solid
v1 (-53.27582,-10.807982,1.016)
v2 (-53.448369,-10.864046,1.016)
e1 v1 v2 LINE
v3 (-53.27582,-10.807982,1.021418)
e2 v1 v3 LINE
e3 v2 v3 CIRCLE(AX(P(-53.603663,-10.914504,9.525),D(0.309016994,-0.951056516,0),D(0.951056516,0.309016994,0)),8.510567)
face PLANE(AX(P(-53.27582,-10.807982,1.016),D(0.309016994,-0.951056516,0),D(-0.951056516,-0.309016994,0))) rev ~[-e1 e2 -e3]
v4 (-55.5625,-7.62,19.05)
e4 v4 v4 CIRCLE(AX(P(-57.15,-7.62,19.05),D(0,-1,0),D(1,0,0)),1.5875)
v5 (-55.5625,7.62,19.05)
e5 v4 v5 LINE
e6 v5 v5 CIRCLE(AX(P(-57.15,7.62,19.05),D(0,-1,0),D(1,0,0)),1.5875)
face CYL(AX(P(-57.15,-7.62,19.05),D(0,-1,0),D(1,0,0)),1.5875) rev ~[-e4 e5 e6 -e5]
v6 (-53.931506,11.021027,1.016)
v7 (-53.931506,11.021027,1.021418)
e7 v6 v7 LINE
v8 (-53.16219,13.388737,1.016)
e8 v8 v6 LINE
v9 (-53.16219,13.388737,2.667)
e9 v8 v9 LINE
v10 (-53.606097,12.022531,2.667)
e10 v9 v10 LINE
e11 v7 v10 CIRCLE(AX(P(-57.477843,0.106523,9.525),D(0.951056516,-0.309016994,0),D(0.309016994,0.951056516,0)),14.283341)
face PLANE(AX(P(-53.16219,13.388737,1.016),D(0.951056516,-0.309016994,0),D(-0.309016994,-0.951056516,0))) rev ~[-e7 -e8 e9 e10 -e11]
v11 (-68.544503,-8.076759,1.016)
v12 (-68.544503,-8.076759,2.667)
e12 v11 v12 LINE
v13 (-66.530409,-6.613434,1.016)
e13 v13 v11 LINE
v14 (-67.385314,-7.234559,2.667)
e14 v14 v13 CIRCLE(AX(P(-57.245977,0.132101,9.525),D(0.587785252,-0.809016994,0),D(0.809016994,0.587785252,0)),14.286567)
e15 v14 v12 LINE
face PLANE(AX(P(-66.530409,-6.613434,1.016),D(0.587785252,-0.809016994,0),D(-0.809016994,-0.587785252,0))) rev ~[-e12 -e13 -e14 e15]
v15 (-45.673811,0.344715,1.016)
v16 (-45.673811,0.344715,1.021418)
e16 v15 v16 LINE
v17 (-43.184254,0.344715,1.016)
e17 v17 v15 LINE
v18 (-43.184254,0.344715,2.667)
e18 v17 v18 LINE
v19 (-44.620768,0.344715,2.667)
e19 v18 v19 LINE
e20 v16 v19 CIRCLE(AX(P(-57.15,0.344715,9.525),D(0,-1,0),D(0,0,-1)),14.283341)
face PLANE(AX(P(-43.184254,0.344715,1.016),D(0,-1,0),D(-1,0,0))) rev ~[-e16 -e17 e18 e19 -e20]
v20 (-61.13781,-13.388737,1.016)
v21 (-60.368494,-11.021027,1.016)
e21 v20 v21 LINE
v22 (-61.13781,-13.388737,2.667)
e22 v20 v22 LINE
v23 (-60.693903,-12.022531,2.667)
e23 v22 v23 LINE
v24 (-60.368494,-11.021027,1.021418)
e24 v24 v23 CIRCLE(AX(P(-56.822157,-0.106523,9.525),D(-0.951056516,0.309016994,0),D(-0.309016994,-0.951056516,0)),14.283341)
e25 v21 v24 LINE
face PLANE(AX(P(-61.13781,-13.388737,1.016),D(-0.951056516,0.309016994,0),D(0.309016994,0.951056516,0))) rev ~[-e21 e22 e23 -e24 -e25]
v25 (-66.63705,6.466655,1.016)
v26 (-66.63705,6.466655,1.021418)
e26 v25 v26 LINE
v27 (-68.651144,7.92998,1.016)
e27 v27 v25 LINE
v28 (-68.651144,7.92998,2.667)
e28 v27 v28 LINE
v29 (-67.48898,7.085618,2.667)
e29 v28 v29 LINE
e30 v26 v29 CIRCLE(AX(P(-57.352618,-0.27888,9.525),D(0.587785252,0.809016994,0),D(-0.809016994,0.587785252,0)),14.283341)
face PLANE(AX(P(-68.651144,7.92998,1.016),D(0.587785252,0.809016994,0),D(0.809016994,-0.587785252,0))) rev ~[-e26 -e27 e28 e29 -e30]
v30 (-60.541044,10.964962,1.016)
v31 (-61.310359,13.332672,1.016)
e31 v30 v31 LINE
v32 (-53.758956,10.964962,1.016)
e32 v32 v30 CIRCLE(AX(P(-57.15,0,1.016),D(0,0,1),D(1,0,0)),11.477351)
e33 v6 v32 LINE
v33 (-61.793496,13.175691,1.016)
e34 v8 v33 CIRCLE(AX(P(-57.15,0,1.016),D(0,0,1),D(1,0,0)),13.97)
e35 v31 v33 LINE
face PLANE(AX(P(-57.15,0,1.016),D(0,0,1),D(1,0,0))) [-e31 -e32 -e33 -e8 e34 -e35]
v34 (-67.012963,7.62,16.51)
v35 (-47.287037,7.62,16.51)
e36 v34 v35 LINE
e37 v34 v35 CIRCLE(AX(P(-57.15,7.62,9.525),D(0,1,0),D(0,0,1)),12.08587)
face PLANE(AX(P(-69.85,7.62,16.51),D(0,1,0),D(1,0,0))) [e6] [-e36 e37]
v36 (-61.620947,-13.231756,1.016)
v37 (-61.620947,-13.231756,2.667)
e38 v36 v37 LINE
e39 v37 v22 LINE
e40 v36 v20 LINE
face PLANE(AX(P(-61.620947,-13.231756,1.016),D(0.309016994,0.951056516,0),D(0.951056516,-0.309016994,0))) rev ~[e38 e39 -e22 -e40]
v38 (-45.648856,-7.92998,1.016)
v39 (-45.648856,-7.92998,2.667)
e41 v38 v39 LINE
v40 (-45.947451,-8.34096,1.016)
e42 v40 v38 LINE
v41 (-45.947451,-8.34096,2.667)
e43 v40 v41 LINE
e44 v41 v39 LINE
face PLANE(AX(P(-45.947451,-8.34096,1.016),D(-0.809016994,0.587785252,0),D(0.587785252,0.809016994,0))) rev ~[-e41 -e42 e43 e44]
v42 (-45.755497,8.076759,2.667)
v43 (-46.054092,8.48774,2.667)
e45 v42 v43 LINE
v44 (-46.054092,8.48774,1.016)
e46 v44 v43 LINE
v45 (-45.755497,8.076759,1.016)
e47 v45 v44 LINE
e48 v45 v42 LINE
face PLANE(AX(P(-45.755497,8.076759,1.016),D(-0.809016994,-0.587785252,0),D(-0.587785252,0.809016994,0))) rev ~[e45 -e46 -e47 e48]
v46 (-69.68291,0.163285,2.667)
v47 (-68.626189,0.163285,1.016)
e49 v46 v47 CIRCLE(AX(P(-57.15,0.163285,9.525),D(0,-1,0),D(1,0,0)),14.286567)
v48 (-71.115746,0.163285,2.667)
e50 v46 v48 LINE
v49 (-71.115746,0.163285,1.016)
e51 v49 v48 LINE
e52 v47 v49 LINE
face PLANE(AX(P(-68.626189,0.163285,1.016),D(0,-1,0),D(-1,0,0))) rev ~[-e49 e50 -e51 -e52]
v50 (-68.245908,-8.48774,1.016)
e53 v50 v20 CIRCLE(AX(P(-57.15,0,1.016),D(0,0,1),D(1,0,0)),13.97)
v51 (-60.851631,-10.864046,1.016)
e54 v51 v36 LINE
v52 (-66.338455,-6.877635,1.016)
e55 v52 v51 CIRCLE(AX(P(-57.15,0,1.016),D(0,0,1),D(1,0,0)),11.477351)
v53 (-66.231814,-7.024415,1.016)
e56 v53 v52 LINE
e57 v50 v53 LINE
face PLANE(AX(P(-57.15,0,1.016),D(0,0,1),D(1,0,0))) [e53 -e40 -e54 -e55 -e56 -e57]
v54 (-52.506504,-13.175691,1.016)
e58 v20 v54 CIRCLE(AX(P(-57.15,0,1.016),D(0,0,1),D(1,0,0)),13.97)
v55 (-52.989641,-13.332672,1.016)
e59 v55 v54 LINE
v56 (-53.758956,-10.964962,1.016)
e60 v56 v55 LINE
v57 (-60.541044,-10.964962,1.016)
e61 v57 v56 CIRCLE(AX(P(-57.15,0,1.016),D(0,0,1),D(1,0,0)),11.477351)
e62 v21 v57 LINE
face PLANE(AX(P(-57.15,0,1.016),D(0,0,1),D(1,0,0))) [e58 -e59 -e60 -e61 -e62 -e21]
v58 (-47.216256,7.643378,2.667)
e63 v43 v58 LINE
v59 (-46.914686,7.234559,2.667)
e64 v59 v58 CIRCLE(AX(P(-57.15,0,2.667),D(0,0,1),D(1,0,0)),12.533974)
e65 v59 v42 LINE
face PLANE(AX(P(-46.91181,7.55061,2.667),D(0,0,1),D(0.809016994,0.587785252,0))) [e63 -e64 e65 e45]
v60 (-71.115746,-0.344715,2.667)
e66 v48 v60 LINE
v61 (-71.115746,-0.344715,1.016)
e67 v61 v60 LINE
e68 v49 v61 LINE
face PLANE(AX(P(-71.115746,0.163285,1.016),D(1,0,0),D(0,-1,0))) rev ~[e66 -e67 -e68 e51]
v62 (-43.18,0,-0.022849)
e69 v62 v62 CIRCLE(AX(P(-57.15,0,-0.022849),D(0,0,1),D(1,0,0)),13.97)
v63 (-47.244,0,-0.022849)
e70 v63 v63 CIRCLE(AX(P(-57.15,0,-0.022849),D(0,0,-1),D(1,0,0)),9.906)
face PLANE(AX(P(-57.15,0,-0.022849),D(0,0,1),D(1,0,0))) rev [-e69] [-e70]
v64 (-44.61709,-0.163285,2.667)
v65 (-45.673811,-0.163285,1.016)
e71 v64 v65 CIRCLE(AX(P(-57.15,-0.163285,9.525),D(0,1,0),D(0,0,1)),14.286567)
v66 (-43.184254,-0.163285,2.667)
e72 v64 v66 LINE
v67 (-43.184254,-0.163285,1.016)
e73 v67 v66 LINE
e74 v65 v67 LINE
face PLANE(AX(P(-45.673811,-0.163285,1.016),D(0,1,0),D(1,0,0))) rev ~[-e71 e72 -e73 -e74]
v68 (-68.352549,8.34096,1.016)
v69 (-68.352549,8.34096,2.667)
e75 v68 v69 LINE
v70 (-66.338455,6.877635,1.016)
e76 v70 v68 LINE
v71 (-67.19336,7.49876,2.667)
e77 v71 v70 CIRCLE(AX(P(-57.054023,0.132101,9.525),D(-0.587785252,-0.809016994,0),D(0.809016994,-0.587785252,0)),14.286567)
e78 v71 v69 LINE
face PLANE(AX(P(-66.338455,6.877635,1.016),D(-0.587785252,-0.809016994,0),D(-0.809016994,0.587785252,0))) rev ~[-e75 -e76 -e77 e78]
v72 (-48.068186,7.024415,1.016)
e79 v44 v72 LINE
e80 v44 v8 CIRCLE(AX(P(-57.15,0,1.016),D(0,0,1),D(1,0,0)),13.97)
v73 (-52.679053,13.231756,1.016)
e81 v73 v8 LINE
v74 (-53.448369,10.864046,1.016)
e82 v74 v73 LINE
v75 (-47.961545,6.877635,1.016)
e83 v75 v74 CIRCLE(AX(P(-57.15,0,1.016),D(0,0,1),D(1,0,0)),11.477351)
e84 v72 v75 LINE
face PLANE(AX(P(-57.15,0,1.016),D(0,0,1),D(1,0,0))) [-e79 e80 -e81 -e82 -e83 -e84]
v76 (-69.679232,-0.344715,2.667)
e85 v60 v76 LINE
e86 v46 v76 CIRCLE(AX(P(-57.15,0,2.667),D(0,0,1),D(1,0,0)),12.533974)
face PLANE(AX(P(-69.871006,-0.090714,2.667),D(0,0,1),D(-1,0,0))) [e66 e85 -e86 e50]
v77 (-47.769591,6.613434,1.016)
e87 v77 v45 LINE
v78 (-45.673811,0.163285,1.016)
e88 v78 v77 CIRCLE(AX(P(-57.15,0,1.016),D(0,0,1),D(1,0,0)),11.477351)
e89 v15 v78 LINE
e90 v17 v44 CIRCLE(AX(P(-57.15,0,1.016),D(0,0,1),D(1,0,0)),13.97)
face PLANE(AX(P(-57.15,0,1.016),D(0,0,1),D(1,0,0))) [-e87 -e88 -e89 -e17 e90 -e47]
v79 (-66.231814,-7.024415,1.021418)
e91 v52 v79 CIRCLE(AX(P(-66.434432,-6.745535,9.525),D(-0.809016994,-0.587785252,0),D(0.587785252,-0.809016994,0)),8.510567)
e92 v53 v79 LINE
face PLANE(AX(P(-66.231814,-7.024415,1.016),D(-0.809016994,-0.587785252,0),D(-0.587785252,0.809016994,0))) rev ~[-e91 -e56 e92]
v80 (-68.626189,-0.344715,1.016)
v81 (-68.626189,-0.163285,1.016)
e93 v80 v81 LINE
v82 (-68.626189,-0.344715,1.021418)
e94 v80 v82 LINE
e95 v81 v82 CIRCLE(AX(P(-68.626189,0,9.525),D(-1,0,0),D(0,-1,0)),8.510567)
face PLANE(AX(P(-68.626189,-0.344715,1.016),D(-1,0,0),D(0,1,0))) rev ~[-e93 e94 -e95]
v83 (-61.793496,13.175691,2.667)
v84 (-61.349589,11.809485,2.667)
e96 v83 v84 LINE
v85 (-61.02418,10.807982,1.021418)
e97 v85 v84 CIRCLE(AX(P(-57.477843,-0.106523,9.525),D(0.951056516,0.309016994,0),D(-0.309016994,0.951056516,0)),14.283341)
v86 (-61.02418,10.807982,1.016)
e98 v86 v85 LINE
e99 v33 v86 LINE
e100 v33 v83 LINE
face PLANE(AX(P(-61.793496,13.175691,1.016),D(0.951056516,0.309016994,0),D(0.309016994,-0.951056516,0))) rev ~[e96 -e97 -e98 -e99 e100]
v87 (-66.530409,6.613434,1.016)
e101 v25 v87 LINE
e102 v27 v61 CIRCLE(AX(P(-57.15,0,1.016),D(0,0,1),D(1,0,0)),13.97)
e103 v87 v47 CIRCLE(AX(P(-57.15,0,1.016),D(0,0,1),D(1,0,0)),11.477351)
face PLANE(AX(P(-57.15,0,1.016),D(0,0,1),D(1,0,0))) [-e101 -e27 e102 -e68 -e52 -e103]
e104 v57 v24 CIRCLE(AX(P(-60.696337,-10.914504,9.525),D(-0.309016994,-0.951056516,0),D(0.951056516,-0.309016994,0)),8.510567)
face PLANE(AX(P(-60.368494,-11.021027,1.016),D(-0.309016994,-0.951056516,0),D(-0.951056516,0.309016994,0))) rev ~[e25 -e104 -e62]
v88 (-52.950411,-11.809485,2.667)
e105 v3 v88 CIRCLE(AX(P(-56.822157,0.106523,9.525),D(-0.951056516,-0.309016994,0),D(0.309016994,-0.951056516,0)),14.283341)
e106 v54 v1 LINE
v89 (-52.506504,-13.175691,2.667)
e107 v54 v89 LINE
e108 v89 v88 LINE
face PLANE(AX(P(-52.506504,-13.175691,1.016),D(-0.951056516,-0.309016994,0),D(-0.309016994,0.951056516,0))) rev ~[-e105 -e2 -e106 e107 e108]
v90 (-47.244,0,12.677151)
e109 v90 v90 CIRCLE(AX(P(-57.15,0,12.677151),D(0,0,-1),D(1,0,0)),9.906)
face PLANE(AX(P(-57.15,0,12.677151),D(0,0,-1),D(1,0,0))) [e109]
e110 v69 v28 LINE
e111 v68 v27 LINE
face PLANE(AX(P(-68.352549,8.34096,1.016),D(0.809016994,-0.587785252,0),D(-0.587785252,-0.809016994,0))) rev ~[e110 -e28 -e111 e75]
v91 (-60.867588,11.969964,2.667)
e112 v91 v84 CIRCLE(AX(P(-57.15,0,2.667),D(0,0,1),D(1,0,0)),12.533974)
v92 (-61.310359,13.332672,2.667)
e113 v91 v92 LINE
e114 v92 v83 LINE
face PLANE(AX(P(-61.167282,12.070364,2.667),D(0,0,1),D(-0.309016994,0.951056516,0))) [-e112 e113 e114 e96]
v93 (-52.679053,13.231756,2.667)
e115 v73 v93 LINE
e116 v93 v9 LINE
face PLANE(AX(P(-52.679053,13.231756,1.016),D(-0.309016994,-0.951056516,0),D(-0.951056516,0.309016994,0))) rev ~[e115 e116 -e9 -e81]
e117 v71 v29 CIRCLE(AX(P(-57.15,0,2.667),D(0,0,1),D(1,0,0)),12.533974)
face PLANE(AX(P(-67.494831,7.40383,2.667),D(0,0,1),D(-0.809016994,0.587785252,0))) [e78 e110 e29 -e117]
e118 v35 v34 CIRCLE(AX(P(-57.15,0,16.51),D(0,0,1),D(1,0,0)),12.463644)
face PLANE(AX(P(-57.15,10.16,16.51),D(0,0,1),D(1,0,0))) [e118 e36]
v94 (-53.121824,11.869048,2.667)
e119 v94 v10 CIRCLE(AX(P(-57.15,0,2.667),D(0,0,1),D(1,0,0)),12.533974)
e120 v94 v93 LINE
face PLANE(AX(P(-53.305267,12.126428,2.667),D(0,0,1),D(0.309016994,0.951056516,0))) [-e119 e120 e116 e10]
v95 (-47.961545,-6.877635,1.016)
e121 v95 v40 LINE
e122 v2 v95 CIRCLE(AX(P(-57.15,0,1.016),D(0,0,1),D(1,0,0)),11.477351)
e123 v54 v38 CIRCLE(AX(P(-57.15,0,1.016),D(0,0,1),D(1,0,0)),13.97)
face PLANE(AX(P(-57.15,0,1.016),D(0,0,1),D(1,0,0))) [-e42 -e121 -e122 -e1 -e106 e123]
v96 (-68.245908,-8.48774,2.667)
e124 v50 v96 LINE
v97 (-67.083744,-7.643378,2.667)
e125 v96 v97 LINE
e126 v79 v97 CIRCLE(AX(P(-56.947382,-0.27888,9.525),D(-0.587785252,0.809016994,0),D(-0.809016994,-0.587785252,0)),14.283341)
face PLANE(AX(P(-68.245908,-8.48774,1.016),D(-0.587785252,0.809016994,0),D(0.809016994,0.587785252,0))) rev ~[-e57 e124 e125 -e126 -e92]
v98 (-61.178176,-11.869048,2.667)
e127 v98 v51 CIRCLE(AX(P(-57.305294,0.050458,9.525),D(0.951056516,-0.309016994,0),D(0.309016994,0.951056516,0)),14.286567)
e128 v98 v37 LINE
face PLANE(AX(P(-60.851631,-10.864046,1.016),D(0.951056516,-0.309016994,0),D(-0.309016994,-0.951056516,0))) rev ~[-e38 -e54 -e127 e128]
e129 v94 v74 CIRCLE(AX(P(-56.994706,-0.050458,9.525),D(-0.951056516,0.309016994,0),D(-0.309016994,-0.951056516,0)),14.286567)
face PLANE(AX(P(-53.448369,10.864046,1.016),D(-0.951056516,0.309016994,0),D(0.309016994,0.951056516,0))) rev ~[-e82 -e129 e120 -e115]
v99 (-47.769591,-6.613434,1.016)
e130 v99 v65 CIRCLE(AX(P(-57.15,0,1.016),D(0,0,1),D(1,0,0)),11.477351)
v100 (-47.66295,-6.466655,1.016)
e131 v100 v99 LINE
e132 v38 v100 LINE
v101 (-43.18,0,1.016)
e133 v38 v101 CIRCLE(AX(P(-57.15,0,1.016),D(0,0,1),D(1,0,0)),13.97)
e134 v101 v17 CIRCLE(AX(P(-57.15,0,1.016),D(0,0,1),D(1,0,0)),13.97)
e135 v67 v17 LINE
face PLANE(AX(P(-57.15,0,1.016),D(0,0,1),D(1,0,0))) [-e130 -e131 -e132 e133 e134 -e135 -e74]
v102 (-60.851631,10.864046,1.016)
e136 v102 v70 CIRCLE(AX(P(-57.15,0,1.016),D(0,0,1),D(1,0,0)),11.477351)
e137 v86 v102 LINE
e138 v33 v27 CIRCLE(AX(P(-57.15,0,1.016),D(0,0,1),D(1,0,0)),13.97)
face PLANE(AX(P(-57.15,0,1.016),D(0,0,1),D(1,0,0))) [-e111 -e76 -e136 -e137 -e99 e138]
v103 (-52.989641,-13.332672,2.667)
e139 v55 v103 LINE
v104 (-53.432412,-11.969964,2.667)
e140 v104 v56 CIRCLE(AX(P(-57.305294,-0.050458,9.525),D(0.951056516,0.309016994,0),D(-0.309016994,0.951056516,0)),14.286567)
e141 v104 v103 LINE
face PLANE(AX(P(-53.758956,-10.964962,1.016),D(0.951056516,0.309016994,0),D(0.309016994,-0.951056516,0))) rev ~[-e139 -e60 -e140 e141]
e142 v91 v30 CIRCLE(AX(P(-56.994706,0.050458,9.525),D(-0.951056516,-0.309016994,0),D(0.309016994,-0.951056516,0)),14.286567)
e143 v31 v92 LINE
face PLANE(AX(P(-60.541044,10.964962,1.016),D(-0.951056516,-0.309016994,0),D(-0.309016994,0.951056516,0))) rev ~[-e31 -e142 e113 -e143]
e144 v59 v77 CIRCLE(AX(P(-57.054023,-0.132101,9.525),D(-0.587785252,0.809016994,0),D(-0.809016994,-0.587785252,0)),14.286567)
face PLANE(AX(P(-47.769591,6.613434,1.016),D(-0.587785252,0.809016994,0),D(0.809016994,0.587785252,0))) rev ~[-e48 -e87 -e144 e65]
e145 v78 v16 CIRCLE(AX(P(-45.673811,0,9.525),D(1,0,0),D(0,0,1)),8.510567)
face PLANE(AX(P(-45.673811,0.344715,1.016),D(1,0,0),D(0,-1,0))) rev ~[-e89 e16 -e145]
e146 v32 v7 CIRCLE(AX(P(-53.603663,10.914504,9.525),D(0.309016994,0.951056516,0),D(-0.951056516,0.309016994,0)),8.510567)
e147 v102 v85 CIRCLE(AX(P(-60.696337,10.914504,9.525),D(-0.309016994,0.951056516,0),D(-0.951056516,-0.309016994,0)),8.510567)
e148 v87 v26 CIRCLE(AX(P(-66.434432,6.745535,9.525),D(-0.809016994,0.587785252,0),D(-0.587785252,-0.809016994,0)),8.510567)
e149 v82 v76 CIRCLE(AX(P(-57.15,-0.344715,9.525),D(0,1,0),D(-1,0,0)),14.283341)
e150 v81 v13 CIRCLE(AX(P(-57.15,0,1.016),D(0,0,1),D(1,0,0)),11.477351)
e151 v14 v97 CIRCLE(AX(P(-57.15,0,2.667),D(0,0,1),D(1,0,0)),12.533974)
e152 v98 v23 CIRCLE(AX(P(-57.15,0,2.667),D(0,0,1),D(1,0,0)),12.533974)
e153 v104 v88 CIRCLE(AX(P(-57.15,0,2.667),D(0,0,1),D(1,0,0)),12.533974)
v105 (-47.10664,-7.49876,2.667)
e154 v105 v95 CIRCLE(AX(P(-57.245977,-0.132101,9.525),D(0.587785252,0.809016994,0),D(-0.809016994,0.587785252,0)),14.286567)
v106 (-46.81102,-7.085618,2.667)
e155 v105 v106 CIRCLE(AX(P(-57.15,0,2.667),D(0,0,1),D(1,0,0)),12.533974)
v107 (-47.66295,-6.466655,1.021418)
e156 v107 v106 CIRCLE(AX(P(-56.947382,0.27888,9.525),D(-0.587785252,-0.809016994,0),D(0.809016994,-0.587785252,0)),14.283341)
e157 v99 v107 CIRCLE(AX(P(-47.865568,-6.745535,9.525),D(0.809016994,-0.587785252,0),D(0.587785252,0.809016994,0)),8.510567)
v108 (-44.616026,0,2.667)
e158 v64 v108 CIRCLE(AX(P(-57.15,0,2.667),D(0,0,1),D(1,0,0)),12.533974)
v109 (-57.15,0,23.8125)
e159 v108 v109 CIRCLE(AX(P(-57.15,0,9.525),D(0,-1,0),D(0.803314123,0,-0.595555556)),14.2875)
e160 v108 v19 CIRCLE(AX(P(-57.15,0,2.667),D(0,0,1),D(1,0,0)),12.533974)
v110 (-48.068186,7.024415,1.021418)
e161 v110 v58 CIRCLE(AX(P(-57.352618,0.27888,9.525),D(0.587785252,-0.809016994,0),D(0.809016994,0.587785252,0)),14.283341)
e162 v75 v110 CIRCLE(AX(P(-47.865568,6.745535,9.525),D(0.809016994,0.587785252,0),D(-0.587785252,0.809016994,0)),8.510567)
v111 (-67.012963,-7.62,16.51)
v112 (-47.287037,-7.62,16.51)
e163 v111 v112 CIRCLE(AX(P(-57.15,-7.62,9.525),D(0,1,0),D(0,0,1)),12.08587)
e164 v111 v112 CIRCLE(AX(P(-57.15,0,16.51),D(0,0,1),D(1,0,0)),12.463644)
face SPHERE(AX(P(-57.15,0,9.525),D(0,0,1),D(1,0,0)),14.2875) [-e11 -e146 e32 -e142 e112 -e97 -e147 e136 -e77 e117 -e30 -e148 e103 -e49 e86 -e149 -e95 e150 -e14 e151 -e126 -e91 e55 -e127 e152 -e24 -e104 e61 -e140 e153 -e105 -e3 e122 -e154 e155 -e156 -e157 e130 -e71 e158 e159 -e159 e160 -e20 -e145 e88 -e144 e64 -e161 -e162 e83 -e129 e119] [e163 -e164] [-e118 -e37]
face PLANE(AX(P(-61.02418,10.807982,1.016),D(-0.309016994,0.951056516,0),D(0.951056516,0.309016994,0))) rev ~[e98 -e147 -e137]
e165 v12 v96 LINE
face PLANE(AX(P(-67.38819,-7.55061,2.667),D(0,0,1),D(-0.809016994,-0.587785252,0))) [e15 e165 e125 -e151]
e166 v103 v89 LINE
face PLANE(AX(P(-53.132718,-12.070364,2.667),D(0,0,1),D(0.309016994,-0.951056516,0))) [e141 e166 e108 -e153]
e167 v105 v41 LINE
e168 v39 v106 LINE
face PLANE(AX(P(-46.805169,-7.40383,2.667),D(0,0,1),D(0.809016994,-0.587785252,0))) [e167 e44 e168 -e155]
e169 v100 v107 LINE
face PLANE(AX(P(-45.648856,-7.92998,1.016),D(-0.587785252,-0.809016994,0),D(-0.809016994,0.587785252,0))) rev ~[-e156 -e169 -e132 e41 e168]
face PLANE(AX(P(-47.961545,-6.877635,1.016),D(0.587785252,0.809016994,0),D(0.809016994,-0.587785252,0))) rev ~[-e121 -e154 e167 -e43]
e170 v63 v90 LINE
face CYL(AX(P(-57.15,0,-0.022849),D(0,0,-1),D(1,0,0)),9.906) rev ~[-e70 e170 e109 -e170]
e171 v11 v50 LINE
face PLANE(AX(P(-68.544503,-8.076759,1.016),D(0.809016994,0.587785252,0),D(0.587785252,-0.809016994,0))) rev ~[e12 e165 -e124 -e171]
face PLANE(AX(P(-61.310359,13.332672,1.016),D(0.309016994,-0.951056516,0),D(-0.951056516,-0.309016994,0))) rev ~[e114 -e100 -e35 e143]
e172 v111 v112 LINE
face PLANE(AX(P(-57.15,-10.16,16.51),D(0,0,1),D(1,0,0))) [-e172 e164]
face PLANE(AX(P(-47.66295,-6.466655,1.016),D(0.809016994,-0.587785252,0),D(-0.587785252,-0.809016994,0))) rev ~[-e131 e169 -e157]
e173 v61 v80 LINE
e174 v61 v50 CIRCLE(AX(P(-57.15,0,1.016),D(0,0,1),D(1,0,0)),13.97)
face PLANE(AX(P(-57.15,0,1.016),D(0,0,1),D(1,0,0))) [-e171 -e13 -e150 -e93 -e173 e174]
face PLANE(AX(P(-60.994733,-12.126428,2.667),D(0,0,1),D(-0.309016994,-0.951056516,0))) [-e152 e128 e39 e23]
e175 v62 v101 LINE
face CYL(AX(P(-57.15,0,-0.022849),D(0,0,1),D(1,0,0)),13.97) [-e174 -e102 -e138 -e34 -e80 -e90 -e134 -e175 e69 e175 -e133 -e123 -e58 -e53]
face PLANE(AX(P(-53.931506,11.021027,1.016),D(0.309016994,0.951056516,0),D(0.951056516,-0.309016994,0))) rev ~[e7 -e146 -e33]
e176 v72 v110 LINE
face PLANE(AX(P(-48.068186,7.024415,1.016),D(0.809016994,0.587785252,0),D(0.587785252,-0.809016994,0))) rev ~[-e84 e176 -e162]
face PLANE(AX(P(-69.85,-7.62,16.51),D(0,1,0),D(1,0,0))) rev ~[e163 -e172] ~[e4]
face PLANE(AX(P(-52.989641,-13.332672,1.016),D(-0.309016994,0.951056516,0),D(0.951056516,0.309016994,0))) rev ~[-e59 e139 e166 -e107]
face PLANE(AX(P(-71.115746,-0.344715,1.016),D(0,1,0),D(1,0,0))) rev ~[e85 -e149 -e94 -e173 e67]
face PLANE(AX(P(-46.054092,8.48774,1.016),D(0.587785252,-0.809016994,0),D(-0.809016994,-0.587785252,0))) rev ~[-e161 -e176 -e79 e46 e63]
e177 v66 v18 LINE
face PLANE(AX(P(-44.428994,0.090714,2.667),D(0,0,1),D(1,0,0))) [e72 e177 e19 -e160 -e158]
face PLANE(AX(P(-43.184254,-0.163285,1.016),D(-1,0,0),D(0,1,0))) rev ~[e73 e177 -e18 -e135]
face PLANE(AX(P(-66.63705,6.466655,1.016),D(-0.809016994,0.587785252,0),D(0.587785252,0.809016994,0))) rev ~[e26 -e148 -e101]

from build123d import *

# Parameters (mm, degrees)
F3_DEPTH        = 1.651
F3_COPIES_COUNT = 10
F6_W            = 25.4
F6_H            = 5.08
F7_DEPTH        = 6.35
F8_R            = 1.5875
F9_DEPTH        = 3.81
F9_DEPTH_BACK   = 19.05
F10_R           = 9.906
F11_DEPTH       = 12.7
F12_R           = 9.525
F13_DEPTH       = 57.15
F14_R           = 7.62
F15_DEPTH       = 44.45


# Not quite as in the source:
# - a feature of the source that left no trace in its solid (it failed there, or was rolled back) is left out
# - a pattern or mirror of a feature is missing from the dataset's text; its kind, count and spacing are read off the source's solid


with BuildPart() as f1:
    # F0 (on Front) → F1 (revolve)
    with BuildSketch(Plane.XZ):
        with BuildLine():
            Line((-43.18, 1.016), (-45.6726494673, 1.016))
            ThreePointArc((-45.6726494673, 1.016), (-44.3886326409, 15.9499637645), (-57.15, 23.8125))
            Line((-57.15, 23.8125), (-57.15, -0.0228488987))
            Line((-57.15, -0.0228488987), (-43.18, -0.0228488987))
            Line((-43.18, -0.0228488987), (-43.18, 1.016))
        make_face()
    revolve(axis=Axis((-57.15, 0, 11.8948255506), (0, 0, 1)))

    # F2 (on face) → F3 (join)
    with BuildSketch(Plane.XY.offset(1.016)):
        with BuildLine():
            ThreePointArc((-45.6726494673, 0), (-45.6729398633, -0.081644771), (-45.6738110366, -0.1632854104))
            Line((-45.6738110366, -0.1632854104), (-43.1842536235, -0.1632854104))
            Line((-43.1842536235, -0.1632854104), (-43.1842536235, 0.3447145896))
            Line((-43.1842536235, 0.3447145896), (-45.6738110366, 0.3447145896))
            Line((-45.6738110366, 0.3447145896), (-45.6738110366, 0.1632854104))
            ThreePointArc((-45.6738110366, 0.1632854104), (-45.6729398633, 0.081644771), (-45.6726494673, 0))
        make_face()
    f3 = extrude(amount=F3_DEPTH)

    # F3_copies: F3 ×10 about axis
    f3_copies_axis = Axis((-57.15, 0, 0), (0, 0, 1))
    for i in range(1, F3_COPIES_COUNT):
        add(f3.rotate(f3_copies_axis, i * 360 / F3_COPIES_COUNT))

    # F6 (on offset) → F7 (cut)
    with BuildSketch(Plane.XY.offset(16.51)):
        with Locations((-57.15, 10.16)):
            Rectangle(F6_W, F6_H)
        with Locations((-57.15, -10.16)):
            Rectangle(F6_W, F6_H)
    extrude(amount=F7_DEPTH, mode=Mode.SUBTRACT)

    # F8 (on face) → F9 (cut, two sides)
    with BuildSketch(Plane.XZ.offset(7.62)) as f9_sk:
        with Locations((-57.15, 19.05)):
            Circle(F8_R)
    extrude(amount=F9_DEPTH, mode=Mode.SUBTRACT)
    extrude(f9_sk.sketch, amount=-F9_DEPTH_BACK, mode=Mode.SUBTRACT)

    # F10 (on face) → F11 (cut)
    with BuildSketch(Plane(origin=(0, 0, -0.0228488987), x_dir=(1, 0, 0), z_dir=(0, 0, -1))):
        with Locations((-57.15, 0)):
            Circle(F10_R)
    extrude(amount=-F11_DEPTH, mode=Mode.SUBTRACT)


with BuildPart() as f13:
    # F12 (on Top) → F13 (new body)
    with BuildSketch(Plane.XY):
        Circle(F12_R)
    extrude(amount=F13_DEPTH)

    # F14 (on face) → F15 (cut)
    with BuildSketch(Plane(origin=(0, 0, 0), x_dir=(1, 0, 0), z_dir=(0, 0, -1))):
        Circle(F14_R)
    extrude(amount=-F15_DEPTH, mode=Mode.SUBTRACT)


solid = f1.part
